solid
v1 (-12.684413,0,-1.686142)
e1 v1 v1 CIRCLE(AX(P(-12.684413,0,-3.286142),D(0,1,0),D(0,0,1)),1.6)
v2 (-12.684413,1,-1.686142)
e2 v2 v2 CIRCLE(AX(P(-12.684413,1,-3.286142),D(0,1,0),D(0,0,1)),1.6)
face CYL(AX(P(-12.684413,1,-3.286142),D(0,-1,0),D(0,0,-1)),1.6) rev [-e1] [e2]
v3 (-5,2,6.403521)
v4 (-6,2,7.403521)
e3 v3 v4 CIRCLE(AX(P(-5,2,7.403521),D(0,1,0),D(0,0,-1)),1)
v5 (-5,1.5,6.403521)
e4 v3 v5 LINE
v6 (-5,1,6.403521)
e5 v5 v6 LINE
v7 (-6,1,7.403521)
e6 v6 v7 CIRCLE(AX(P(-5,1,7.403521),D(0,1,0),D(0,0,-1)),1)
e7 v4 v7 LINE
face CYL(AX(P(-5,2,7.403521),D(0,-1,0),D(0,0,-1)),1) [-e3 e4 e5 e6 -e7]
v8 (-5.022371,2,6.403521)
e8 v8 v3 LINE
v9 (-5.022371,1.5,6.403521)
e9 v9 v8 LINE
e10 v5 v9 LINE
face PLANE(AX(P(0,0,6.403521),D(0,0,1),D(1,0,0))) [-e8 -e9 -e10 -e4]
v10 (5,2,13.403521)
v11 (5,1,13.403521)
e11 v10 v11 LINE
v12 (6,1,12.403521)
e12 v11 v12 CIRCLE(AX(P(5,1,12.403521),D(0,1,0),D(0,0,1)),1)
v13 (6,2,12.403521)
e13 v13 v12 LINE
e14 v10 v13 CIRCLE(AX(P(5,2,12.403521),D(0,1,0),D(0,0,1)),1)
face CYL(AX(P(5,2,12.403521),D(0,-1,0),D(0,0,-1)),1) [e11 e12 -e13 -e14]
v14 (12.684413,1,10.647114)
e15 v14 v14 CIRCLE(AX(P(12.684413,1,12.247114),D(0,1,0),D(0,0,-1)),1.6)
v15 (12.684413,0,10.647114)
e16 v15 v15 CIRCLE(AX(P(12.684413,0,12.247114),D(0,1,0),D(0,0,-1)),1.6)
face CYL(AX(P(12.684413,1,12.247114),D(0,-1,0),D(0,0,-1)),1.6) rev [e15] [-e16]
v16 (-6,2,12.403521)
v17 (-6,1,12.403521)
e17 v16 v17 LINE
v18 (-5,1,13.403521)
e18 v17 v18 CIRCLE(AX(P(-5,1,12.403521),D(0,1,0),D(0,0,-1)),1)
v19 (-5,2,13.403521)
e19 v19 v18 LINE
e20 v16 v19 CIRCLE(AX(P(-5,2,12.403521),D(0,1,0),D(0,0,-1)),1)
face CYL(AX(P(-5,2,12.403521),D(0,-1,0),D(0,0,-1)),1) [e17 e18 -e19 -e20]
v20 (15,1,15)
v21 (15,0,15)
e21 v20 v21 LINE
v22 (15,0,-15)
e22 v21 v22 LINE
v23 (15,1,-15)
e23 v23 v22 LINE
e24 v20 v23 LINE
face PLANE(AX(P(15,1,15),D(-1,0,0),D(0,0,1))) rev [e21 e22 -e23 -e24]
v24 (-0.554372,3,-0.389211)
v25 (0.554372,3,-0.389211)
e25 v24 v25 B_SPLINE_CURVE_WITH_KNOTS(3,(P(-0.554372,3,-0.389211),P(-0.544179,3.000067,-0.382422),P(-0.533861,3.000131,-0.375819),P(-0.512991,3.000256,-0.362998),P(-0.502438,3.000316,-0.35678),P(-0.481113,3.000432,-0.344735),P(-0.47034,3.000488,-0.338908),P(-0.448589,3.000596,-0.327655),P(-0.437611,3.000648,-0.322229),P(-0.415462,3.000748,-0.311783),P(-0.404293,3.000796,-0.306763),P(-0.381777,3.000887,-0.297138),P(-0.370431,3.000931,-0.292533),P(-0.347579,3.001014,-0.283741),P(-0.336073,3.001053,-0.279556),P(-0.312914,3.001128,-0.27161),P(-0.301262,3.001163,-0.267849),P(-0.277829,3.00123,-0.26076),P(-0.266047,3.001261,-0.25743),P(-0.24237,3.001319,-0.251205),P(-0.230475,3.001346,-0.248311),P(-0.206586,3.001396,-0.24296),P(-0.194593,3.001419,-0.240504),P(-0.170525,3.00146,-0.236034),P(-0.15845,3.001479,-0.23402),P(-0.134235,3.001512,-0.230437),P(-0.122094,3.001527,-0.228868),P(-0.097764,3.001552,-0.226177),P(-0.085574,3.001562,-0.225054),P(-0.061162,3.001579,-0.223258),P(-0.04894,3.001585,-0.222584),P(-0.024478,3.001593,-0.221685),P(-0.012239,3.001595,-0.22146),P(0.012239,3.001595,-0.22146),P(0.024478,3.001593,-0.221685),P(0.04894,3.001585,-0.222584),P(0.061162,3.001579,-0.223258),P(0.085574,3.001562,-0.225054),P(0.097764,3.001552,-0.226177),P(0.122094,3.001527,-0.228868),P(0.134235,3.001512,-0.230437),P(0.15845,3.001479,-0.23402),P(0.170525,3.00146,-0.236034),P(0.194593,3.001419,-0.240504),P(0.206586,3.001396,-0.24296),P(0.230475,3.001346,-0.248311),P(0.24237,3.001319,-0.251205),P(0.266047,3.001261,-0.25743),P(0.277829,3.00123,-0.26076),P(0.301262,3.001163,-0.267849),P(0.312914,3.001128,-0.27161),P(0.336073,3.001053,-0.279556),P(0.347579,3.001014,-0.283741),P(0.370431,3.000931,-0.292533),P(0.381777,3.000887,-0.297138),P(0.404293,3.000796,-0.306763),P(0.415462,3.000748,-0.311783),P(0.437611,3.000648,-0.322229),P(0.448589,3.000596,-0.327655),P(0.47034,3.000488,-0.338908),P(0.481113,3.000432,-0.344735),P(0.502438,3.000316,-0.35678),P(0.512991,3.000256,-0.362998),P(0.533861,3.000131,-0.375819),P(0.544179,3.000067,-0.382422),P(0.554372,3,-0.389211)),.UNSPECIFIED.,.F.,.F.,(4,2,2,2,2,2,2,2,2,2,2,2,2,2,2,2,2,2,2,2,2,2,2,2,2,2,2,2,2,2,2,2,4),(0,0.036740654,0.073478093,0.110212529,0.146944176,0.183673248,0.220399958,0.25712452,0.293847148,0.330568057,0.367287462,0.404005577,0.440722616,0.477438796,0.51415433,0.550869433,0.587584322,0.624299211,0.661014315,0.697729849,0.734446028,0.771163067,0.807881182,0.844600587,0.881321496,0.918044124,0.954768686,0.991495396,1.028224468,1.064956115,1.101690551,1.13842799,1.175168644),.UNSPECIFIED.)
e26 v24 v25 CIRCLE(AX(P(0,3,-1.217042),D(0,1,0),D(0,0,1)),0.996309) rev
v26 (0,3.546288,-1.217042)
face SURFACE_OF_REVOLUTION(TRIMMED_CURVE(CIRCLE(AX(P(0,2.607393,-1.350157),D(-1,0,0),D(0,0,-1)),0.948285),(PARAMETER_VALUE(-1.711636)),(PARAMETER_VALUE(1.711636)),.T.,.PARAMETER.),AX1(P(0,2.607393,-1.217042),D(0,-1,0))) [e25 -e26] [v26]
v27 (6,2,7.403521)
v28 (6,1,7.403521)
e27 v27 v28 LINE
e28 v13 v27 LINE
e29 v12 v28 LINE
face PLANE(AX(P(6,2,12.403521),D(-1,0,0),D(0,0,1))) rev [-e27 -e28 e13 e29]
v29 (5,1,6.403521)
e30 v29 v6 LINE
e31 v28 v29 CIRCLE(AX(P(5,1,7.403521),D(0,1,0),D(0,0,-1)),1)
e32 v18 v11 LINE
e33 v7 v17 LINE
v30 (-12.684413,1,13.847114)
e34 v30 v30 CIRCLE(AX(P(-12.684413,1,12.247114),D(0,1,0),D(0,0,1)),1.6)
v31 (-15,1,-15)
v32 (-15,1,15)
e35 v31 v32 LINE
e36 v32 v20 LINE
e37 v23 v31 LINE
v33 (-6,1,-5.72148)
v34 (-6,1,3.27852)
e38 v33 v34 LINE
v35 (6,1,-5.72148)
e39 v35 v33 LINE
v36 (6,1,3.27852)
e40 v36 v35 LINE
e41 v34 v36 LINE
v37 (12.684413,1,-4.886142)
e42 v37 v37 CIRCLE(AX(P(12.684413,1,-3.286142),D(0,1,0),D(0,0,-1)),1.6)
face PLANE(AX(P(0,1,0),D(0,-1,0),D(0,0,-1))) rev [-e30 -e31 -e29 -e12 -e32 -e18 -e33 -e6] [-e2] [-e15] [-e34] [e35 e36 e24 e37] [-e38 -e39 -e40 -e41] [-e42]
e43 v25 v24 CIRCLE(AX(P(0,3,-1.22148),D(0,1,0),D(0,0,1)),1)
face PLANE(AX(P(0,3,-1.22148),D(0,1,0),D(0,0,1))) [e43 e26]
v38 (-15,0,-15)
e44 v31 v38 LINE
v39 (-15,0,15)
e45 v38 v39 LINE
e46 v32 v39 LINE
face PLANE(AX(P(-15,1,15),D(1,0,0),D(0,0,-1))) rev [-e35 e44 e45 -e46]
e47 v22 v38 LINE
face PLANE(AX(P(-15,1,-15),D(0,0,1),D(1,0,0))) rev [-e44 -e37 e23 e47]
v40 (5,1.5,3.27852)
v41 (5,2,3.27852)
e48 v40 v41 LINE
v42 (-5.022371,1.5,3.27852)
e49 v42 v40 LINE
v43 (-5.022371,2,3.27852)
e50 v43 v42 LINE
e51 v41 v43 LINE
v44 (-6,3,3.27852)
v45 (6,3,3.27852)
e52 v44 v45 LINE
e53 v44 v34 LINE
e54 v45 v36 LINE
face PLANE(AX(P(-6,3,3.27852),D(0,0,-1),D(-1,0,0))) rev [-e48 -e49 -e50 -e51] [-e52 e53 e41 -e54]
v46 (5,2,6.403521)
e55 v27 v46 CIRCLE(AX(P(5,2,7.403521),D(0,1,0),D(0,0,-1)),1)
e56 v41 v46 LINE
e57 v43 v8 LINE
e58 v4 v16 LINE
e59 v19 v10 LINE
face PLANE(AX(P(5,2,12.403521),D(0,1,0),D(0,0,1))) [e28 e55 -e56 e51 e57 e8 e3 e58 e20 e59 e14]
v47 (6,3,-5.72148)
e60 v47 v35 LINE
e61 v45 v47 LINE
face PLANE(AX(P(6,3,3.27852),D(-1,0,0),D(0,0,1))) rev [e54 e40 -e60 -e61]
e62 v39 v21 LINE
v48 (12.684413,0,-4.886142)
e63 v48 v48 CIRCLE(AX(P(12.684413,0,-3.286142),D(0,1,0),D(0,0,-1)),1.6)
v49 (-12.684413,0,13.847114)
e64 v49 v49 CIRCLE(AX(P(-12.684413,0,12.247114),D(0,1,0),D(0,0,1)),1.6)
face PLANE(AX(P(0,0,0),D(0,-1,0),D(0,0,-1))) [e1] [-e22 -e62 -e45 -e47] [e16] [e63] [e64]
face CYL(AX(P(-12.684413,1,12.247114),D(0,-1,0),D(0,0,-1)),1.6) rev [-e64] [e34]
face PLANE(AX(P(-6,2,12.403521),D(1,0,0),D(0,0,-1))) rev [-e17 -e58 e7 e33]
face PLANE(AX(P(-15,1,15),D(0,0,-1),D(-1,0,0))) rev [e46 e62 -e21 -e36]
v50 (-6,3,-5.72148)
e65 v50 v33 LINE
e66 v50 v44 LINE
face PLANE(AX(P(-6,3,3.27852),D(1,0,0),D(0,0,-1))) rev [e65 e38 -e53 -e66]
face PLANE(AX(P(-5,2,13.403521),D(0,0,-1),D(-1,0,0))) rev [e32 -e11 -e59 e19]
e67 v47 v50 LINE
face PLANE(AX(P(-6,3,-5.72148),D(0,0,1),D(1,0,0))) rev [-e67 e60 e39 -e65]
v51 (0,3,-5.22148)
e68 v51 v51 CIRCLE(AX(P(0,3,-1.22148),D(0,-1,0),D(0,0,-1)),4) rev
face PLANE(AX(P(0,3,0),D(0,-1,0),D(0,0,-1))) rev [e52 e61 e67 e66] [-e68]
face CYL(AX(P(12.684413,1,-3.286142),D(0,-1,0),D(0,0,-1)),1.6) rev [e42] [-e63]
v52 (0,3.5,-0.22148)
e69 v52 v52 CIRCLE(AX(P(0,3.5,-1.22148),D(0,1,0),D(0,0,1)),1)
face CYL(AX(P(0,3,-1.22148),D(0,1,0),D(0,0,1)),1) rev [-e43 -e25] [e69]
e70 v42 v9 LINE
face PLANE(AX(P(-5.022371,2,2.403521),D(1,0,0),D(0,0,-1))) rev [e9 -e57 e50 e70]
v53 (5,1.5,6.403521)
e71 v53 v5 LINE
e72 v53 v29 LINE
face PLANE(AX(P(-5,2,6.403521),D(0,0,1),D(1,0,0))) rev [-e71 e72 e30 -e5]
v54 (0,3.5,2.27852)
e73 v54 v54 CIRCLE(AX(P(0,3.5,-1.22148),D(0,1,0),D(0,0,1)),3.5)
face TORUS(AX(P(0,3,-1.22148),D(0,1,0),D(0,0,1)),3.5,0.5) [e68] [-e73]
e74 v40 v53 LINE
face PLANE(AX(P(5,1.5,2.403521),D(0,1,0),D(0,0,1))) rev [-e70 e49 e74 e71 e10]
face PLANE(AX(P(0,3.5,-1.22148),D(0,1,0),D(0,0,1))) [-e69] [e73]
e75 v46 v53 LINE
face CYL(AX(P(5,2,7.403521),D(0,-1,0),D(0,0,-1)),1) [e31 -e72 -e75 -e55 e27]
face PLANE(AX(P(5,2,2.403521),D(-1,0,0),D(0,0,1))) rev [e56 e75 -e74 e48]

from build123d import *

# Parameters (mm, degrees)
CROQUIS1_W              = 30
CROQUIS1_H              = 30
CROQUIS1_R              = 1.6
SALIENTE_EXTRUIR1_DEPTH = 1
SALIENTE_EXTRUIR2_DEPTH = 1
CROQUIS3_W              = 12
CROQUIS3_H              = 9
SALIENTE_EXTRUIR3_DEPTH = 2
CROQUIS4_W              = 10.022371477
CROQUIS4_H              = 0.5
SALIENTE_EXTRUIR4_DEPTH = 4
CROQUIS6_R              = 4
SALIENTE_EXTRUIR5_DEPTH = 0.5
REDONDEO1_R             = 0.5
CROQUIS7_R              = 1
CORTAR_EXTRUIR1_DEPTH   = 0.5


with BuildPart() as part:
    # Croquis1 → Saliente-Extruir1 (new body)
    with BuildSketch(Plane(origin=(0, 0, 0), x_dir=(1, 0, 0), z_dir=(0, 1, 0))):
        Rectangle(CROQUIS1_W, CROQUIS1_H)
        with Locations(Location((-12.684412522, 3.286142093, 0), (0, 0, 270))):
            Circle(CROQUIS1_R, mode=Mode.SUBTRACT)
        with Locations(Location((-12.684412522, -12.247114296, 0), (0, 0, 270))):
            Circle(CROQUIS1_R, mode=Mode.SUBTRACT)
        with Locations(Location((12.684412522, -12.247114296, 0), (0, 0, 90))):
            Circle(CROQUIS1_R, mode=Mode.SUBTRACT)
        with Locations(Location((12.684412522, 3.286142093, 0), (0, 0, 90))):
            Circle(CROQUIS1_R, mode=Mode.SUBTRACT)
    extrude(amount=SALIENTE_EXTRUIR1_DEPTH)

    # Croquis2 → Saliente-Extruir2 (add)
    with BuildSketch(Plane(origin=(0, 1, 0), x_dir=(1, 0, 0), z_dir=(0, 1, 0))):
        with BuildLine():
            Line((-5, -13.403521049), (5, -13.403521049))
            ThreePointArc((5, -13.403521049), (5.707106781, -13.110627831), (6, -12.403521049))
            Line((6, -12.403521049), (6, -7.403521049))
            ThreePointArc((6, -7.403521049), (5.707106781, -6.696414268), (5, -6.403521049))
            Line((5, -6.403521049), (-5, -6.403521049))
            ThreePointArc((-5, -6.403521049), (-5.707106781, -6.696414268), (-6, -7.403521049))
            Line((-6, -7.403521049), (-6, -12.403521049))
            ThreePointArc((-6, -12.403521049), (-5.707106781, -13.110627831), (-5, -13.403521049))
        make_face()
    extrude(amount=SALIENTE_EXTRUIR2_DEPTH)

    # Croquis3 → Saliente-Extruir3 (add)
    with BuildSketch(Plane(origin=(0, 1, 0), x_dir=(1, 0, 0), z_dir=(0, 1, 0))):
        with Locations((0, 1.221480481)):
            Rectangle(CROQUIS3_W, CROQUIS3_H)
    extrude(amount=SALIENTE_EXTRUIR3_DEPTH)

    # Croquis4 → Saliente-Extruir4 (add)
    with BuildSketch(Plane(origin=(0, 0, 6.403521049), x_dir=(-1, 0, 0), z_dir=(0, 0, -1))):
        with Locations((0.011185739, 1.75)):
            Rectangle(CROQUIS4_W, CROQUIS4_H)
    extrude(amount=SALIENTE_EXTRUIR4_DEPTH)

    # Croquis6 → Saliente-Extruir5 (add)
    with BuildSketch(Plane(origin=(0, 3, 0), x_dir=(1, 0, 0), z_dir=(0, 1, 0))):
        with Locations(Location((0, 1.221480481, 0), (0, 0, 90))):
            Circle(CROQUIS6_R)
    extrude(amount=SALIENTE_EXTRUIR5_DEPTH)

    # Redondeo1
    redondeo1_edges = [part.edges().sort_by_distance(p)[0] for p in [
        (0, 3.5, 2.778519519),
    ]]
    fillet(redondeo1_edges, radius=REDONDEO1_R - 0.0001)  # a hair under: the kernel refuses the full size

    # Croquis7 → Cortar-Extruir1 (cut)
    with BuildSketch(Plane(origin=(0, 3.5, 0), x_dir=(1, 0, 0), z_dir=(0, 1, 0))):
        with Locations(Location((0, 1.221480481, 0), (0, 0, 270))):
            Circle(CROQUIS7_R)
    extrude(amount=-CORTAR_EXTRUIR1_DEPTH, mode=Mode.SUBTRACT)

    # Croquis9 → Revolución1 (revolve)
    with BuildSketch(Plane(origin=(0, 0, 0), x_dir=(0, 0, -1), z_dir=(1, 0, 0))):
        with BuildLine():
            Line((0.219475517, 2.997223498), (1.217042009, 2.997223498))
            Line((1.217042009, 2.997223498), (1.217042009, 3.546288473))
            ThreePointArc((1.217042009, 3.546288473), (0.626672887, 3.438153416), (0.219475517, 2.997223498))
        make_face()
    revolve(axis=Axis((0, 2.997223498, -1.217042009), (0, 1, 0)))


solid = part.part
